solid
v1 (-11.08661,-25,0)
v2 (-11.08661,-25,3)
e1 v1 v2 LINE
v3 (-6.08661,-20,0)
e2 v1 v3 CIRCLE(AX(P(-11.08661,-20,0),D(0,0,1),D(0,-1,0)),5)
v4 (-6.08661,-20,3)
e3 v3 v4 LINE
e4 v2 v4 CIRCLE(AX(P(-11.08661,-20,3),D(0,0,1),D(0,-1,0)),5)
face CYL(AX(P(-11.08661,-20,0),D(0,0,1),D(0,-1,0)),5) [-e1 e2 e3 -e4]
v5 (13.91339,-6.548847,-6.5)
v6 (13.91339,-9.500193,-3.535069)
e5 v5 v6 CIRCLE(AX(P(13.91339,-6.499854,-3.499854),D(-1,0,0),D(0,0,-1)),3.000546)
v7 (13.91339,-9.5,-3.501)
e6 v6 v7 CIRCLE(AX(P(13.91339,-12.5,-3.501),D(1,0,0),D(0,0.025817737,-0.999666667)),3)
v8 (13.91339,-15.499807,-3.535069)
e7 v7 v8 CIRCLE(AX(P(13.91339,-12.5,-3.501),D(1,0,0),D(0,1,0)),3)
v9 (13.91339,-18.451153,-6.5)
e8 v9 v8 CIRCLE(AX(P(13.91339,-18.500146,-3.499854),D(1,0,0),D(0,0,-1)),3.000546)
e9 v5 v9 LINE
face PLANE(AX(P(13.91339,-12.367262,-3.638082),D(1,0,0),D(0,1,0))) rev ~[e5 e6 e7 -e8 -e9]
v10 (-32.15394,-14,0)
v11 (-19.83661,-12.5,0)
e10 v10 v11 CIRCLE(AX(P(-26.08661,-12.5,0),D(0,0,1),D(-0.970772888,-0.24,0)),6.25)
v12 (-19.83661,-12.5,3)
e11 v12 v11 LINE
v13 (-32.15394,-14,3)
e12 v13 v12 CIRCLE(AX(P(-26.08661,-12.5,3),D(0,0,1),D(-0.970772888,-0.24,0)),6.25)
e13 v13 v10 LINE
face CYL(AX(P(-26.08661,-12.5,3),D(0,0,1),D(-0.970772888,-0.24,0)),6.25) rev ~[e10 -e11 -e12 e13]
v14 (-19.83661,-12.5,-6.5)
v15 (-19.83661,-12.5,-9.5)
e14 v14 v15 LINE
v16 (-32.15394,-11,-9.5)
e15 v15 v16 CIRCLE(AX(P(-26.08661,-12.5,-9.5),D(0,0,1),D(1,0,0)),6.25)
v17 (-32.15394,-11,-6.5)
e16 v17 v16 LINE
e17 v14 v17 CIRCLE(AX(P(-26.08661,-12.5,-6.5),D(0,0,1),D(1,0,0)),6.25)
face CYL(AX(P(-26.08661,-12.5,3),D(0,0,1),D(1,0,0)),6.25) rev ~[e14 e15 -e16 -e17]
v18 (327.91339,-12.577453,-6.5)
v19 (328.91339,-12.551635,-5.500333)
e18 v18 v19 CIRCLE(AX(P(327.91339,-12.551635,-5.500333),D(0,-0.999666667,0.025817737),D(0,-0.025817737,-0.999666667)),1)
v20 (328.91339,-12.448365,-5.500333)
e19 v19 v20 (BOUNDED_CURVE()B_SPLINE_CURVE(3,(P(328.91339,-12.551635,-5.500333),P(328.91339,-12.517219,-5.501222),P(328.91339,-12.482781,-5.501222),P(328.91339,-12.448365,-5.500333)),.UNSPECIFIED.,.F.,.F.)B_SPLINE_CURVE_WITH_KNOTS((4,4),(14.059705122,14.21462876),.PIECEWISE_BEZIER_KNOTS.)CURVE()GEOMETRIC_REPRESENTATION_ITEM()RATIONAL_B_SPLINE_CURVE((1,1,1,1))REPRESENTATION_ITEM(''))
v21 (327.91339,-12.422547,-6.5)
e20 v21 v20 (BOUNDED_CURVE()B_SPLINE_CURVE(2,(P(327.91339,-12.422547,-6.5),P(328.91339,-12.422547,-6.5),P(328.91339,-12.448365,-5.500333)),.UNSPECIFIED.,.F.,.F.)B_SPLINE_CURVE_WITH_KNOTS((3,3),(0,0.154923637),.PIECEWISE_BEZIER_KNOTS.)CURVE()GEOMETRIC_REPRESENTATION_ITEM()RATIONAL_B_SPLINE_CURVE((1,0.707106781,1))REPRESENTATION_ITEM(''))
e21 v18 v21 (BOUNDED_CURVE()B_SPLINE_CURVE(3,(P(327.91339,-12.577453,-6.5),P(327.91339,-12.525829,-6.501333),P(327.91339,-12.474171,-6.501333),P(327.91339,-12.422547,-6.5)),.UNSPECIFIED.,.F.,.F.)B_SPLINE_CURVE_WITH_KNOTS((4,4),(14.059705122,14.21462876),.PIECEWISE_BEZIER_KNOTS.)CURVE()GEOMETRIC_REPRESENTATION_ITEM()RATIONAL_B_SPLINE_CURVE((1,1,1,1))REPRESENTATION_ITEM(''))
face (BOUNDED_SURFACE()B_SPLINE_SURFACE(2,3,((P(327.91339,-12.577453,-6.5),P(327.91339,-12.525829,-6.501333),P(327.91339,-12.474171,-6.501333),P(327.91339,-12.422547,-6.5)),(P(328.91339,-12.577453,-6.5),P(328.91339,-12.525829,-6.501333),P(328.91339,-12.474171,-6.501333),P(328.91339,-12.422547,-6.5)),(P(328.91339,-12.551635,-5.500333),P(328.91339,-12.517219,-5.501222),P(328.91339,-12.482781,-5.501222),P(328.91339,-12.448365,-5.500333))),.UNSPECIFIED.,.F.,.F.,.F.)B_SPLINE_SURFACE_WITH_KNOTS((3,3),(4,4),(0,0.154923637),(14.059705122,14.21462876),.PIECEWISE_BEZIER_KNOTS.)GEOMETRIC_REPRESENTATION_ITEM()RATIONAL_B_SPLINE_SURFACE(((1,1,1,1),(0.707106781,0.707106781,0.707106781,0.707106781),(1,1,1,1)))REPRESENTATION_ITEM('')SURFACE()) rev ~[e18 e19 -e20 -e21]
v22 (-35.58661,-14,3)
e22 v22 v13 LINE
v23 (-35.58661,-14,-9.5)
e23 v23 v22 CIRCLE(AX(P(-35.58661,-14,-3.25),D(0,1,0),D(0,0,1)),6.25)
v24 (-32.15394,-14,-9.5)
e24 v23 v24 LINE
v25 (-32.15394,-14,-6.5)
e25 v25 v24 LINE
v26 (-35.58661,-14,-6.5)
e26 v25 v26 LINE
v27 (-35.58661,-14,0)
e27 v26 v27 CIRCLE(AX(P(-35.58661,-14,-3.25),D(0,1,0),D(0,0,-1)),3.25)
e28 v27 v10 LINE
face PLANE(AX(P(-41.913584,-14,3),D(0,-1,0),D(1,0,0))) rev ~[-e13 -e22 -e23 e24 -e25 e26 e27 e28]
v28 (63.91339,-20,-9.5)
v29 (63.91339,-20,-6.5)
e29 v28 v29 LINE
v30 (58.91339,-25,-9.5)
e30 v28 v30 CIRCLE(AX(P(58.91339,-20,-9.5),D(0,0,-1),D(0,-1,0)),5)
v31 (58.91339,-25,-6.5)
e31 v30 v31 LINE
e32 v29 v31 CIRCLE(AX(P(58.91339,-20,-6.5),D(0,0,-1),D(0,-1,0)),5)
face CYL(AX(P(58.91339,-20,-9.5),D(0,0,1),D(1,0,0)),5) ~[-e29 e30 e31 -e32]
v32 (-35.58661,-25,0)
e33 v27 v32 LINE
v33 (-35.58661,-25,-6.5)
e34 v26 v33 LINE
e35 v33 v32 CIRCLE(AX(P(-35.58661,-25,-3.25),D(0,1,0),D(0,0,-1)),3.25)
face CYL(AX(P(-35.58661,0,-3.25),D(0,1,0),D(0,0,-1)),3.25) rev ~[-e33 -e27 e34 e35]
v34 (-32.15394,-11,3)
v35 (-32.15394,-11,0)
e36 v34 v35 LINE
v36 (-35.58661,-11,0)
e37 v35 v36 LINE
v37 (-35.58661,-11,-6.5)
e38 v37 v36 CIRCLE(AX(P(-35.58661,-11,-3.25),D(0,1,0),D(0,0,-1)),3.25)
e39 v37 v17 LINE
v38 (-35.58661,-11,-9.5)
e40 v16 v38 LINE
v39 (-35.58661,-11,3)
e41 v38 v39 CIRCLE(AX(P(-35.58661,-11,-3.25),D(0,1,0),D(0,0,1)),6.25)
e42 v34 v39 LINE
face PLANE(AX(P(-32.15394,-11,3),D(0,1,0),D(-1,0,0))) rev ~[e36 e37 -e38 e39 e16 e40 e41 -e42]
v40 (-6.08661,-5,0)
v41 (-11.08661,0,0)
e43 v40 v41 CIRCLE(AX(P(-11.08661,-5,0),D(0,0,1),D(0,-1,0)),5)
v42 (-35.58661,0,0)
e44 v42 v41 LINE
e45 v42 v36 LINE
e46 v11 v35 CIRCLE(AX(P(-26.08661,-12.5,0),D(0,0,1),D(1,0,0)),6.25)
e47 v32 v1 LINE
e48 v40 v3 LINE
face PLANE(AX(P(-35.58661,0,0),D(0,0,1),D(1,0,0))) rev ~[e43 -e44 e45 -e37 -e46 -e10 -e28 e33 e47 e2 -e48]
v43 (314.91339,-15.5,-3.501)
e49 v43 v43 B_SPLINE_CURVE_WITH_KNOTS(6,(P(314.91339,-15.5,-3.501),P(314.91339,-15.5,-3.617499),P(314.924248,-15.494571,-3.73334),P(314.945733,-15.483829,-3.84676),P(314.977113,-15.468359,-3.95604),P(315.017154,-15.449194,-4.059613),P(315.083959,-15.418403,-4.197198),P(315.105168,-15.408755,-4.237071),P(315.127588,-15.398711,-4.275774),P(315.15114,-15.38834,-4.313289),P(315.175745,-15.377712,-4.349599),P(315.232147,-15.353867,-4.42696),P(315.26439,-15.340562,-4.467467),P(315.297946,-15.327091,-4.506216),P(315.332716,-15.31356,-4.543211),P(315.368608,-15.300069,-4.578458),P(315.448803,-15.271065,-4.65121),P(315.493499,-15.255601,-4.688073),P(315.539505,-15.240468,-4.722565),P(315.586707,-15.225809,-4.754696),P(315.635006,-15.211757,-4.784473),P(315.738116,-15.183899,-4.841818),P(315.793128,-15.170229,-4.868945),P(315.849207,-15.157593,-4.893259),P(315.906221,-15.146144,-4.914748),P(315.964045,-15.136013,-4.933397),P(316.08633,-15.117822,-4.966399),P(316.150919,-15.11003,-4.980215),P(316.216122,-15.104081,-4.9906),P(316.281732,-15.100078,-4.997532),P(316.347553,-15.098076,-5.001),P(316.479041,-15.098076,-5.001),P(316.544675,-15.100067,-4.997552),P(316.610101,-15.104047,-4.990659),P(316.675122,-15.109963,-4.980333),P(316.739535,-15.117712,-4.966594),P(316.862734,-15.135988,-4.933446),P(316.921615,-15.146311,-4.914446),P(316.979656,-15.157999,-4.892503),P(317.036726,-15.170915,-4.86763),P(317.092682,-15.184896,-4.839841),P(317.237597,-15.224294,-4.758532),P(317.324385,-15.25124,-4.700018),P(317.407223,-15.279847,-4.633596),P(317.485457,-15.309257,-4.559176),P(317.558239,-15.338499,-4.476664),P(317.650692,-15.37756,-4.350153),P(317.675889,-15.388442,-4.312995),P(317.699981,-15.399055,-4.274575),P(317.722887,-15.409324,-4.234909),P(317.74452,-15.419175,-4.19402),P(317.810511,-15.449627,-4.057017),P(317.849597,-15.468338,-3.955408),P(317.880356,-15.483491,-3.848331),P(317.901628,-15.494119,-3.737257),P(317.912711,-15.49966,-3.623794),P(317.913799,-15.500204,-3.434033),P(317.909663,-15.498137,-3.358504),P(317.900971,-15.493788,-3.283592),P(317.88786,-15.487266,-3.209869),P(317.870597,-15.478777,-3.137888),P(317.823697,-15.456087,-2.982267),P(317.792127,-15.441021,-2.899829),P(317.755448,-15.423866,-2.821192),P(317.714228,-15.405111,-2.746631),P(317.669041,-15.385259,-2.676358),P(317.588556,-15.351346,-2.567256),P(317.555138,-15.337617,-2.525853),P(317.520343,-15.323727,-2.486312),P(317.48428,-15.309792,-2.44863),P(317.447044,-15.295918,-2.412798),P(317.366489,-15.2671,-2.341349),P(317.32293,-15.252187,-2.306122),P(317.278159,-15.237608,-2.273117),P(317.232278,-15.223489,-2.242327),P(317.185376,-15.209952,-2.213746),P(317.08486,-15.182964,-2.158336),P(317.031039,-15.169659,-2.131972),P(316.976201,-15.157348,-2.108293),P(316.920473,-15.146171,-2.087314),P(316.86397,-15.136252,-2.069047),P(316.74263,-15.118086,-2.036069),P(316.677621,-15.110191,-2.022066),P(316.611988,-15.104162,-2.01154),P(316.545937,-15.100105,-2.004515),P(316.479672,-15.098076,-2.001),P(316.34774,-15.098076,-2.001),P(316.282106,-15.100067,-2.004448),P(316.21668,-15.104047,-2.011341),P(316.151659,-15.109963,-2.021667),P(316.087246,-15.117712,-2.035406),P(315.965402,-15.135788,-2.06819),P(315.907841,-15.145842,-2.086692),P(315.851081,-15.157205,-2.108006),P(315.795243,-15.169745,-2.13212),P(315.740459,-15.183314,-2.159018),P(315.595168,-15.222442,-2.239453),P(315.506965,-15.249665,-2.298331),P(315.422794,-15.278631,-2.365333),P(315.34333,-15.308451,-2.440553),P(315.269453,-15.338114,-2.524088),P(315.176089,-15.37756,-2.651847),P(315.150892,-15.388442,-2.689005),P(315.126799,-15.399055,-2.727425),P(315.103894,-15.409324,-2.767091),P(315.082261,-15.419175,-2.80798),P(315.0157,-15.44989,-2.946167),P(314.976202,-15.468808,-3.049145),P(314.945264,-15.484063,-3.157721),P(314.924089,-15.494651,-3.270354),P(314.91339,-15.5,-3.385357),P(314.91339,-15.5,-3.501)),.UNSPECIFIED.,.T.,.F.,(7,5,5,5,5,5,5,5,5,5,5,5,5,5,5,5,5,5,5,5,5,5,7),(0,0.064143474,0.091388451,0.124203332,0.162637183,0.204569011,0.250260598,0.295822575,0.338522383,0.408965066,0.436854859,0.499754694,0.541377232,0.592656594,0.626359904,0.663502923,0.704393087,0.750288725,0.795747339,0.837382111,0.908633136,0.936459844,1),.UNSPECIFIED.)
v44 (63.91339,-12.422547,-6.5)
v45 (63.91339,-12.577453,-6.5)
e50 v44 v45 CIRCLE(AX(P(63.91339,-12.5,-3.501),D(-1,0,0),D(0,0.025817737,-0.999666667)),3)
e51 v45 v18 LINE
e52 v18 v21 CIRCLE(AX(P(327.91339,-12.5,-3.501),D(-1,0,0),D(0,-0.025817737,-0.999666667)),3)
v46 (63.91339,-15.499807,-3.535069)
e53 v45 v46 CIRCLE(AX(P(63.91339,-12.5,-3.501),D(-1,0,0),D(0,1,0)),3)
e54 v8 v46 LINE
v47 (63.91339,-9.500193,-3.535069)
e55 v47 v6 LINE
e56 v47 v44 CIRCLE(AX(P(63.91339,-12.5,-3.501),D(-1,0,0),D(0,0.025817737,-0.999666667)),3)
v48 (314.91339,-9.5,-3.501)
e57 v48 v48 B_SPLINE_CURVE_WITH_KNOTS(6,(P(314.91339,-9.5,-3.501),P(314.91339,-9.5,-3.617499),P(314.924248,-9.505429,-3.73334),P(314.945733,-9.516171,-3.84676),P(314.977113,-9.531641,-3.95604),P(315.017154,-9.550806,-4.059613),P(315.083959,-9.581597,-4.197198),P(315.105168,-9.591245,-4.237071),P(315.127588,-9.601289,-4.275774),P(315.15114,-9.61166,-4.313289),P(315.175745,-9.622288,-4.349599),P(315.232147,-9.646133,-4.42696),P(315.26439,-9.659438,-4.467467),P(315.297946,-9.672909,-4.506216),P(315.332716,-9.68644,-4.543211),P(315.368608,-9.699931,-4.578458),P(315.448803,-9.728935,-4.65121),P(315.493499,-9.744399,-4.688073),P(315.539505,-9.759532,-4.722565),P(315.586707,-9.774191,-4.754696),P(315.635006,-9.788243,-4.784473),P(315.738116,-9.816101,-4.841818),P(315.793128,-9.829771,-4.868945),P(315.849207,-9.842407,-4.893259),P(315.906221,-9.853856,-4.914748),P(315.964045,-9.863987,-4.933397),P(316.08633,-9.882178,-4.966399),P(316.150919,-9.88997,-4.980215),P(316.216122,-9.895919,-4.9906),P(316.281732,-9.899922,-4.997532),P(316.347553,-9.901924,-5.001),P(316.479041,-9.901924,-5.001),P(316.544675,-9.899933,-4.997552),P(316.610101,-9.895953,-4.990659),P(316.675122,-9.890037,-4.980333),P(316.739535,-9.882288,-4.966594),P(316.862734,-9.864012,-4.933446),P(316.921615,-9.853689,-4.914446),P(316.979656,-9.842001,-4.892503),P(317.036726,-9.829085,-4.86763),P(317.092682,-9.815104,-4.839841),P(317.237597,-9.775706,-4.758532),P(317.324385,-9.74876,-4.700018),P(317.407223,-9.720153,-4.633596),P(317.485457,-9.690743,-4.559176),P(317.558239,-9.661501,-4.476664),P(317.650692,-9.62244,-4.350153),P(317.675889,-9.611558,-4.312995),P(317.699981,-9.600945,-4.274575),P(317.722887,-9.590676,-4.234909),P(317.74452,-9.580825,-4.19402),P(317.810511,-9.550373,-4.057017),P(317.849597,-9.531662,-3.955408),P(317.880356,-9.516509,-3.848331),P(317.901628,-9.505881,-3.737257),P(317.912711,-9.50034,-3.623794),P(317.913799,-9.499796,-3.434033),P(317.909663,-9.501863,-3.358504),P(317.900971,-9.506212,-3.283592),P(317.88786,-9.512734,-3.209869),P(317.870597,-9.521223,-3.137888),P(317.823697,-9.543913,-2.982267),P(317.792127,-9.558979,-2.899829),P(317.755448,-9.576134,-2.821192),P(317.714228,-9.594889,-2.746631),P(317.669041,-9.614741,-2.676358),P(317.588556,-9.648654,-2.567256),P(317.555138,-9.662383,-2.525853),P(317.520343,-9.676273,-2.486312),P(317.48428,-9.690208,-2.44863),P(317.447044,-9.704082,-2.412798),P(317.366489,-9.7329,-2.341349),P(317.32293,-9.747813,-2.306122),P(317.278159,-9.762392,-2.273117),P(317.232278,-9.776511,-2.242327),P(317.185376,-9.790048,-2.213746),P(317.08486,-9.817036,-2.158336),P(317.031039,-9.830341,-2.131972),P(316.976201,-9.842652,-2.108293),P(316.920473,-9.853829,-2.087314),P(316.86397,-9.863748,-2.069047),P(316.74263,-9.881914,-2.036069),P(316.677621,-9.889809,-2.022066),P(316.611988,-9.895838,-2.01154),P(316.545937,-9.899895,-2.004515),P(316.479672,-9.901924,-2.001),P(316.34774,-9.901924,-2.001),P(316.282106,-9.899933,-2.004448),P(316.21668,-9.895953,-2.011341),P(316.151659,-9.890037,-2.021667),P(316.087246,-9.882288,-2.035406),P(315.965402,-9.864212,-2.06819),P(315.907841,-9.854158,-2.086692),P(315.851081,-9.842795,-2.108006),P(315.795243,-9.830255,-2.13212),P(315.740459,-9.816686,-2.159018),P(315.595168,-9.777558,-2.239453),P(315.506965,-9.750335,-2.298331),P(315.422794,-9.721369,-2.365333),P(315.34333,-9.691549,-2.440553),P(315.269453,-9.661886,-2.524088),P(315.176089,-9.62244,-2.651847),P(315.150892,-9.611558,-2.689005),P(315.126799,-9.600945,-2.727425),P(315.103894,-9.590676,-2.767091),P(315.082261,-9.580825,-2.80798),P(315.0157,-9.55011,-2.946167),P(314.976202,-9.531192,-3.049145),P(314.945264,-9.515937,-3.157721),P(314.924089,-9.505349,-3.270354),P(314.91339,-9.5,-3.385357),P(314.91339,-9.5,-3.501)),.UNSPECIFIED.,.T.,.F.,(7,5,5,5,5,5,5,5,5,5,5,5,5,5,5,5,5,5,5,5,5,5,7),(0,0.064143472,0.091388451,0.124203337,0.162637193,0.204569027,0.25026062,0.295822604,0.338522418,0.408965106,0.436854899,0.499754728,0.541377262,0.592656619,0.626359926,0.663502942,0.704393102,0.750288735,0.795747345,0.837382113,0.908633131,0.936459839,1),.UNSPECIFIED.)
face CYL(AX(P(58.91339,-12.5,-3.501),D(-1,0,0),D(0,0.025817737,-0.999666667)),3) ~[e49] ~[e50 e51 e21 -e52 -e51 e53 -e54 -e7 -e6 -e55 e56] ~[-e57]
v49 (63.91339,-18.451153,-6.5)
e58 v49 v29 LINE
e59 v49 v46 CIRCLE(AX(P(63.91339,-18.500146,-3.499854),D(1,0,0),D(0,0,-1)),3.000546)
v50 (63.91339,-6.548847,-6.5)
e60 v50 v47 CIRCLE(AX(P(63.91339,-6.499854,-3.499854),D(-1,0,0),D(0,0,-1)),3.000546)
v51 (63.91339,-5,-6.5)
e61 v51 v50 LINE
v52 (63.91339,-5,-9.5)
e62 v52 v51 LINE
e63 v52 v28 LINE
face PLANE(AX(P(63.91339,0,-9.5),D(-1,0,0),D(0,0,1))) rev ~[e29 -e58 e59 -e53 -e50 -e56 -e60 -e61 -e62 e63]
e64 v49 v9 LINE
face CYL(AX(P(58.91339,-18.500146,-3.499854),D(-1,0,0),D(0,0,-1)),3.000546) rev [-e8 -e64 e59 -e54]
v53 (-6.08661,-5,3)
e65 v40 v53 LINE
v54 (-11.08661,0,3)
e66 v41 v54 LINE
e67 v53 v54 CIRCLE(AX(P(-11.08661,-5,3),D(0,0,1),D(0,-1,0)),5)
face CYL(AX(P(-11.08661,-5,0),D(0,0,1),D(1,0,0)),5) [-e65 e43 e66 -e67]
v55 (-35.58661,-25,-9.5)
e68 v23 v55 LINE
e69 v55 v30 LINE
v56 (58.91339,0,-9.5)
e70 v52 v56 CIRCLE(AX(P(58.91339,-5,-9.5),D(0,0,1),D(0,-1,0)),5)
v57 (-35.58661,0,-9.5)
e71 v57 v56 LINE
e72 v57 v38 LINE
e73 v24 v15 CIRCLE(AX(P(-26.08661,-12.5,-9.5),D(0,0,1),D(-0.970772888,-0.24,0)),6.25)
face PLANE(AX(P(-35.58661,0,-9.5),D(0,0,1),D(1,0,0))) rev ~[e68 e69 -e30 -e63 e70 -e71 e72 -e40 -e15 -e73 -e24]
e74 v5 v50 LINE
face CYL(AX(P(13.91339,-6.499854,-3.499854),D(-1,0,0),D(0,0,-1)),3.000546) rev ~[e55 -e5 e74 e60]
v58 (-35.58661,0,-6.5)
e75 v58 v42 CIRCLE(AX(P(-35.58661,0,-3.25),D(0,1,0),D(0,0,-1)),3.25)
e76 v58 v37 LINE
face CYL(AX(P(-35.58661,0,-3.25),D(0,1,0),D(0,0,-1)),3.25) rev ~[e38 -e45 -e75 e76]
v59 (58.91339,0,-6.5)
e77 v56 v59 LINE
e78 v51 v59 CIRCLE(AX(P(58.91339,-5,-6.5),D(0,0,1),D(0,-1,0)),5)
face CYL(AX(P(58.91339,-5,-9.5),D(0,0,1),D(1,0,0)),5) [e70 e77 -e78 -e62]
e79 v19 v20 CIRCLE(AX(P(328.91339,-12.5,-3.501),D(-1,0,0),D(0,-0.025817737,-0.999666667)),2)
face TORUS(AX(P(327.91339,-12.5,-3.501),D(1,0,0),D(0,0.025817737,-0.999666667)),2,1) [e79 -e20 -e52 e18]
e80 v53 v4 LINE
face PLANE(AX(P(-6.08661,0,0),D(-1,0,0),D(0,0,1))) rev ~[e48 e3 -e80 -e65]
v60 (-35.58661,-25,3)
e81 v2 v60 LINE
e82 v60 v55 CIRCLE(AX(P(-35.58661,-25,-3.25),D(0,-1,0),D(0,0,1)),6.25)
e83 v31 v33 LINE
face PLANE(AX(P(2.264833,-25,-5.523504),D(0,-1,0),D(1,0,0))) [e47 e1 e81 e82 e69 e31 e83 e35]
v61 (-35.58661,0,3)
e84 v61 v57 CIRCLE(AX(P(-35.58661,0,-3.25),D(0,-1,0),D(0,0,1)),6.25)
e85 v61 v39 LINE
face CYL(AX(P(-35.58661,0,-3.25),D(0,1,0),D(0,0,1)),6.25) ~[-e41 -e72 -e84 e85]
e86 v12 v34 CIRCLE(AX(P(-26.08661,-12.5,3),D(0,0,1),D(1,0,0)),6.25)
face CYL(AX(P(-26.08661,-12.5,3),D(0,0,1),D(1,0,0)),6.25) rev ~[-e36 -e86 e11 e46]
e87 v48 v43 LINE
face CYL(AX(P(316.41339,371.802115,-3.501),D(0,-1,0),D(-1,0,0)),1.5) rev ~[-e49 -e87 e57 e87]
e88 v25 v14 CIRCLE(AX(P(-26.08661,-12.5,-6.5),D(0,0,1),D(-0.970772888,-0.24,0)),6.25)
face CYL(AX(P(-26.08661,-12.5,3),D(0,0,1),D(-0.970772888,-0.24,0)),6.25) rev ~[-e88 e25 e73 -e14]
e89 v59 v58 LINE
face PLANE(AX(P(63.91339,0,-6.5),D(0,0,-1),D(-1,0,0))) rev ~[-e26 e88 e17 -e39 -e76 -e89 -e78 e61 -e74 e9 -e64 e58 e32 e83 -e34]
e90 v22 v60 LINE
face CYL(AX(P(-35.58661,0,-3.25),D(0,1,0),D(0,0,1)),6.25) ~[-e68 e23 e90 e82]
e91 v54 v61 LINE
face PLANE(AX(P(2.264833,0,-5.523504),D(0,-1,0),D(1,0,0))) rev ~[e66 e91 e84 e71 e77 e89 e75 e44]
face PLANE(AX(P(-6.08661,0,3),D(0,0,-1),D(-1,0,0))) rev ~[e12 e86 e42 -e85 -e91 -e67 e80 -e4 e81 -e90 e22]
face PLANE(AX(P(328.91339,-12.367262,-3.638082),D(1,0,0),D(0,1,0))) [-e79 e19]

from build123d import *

# Parameters (mm, degrees)
F1_DEPTH      = 25
F3_DEPTH      = 12.501
F4_DEPTH      = 12.501
F7_DEPTH      = 270
F7_DEPTH_BACK = 45
F8_T1_DEPTH   = 45
F8_T3_DEPTH   = 5
F9_R          = 5
F10_R         = 1
F12_D         = 3


# Not quite as in the source:
# - a fillet or chamfer that OpenCascade refuses, or shapes differently, is made with other operations: its cross-section is extruded or revolved along the edge and cut away or added


with BuildPart() as f1:
    # F0 (on Front) → F1 (new body)
    with BuildSketch(Plane.XZ):
        with BuildLine():
            ThreePointArc((-35.5866095653, 3), (-41.8366095653, -3.25), (-35.5866095653, -9.5))
            Line((-35.5866095653, -9.5), (63.9133904347, -9.5))
            Line((63.9133904347, -9.5), (63.9133904347, -6.5))
            Line((63.9133904347, -6.5), (-35.5866095653, -6.5))
            ThreePointArc((-35.5866095653, -6.5), (-38.8366095653, -3.25), (-35.5866095653, 0))
            Line((-35.5866095653, 0), (-6.0866095653, 0))
            Line((-6.0866095653, 0), (-6.0866095653, 3))
            Line((-6.0866095653, 3), (-35.5866095653, 3))
        make_face()
    extrude(amount=F1_DEPTH)

    # F2 (on face) → F3 (cut, through all)
    with BuildSketch(Plane.XY.offset(3)):
        with BuildLine():
            ThreePointArc((-32.153940115, -14), (-25.3310686782, -18.7041645665), (-19.8366095653, -12.5))
            ThreePointArc((-19.8366095653, -12.5), (-25.3310686782, -6.2958354335), (-32.153940115, -11))
            ThreePointArc((-32.153940115, -11), (-32.3366095653, -12.5), (-32.153940115, -14))
        make_face()
    extrude(amount=-F3_DEPTH, mode=Mode.SUBTRACT)

    # F2 (on face) → F4 (cut, through all)
    with BuildSketch(Plane.XY.offset(3)):
        with BuildLine():
            ThreePointArc((-32.153940115, -14), (-25.3310686782, -18.7041645665), (-19.8366095653, -12.5))
            ThreePointArc((-19.8366095653, -12.5), (-25.3310686782, -6.2958354335), (-32.153940115, -11))
            ThreePointArc((-32.153940115, -11), (-32.3366095653, -12.5), (-32.153940115, -14))
        make_face()
        with BuildLine():
            ThreePointArc((-32.153940115, -14), (-32.3366095653, -12.5), (-32.153940115, -11))
            Line((-32.153940115, -11), (-41.9135839269, -11))
            Line((-41.9135839269, -11), (-41.9135839269, -14))
            Line((-41.9135839269, -14), (-32.153940115, -14))
        make_face()
    extrude(amount=-F4_DEPTH, mode=Mode.SUBTRACT)

    # F6 (on offset) → F7 (join, two sides)
    with BuildSketch(Plane.YZ.offset(58.9133904347)) as f7_sk:
        with BuildLine():
            ThreePointArc((-12.4225467883, -6.5), (-10.3514703126, -5.5947574316), (-9.5, -3.501))
            ThreePointArc((-9.5, -3.501), (-14.5937574316, -1.3524703126), (-12.5774532117, -6.5))
            Line((-12.5774532117, -6.5), (-12.4225467883, -6.5))
        make_face()
        with BuildLine():
            Line((-12.4225467883, -6.5), (-12.5774532117, -6.5))
            ThreePointArc((-12.5774532117, -6.5), (-12.5, -6.501), (-12.4225467883, -6.5))
        make_face()
    extrude(amount=F7_DEPTH)
    extrude(f7_sk.sketch, amount=-F7_DEPTH_BACK)

    # F8: fillet of radius 3 on 4 edges, made by hand

    # F8_s2 → F8_t1 (join)
    with BuildSketch(Plane.YZ.offset(13.9133904347)):
        with BuildLine():
            ThreePointArc((-18.5001459648, -6.5004), (-16.3786421293, -5.6217630236), (-15.4995999453, -3.5004270532))
            Line((-15.4995999453, -3.5004270532), (-15.1995453433, -3.500484366))
            ThreePointArc((-15.1995453433, -3.500484366), (-14.4336951193, -5.3852845615), (-12.5697064807, -6.2000454108))
            Line((-12.5697064807, -6.2000454108), (-12.5774532117, -6.8000546074))
            ThreePointArc((-12.5774532117, -6.8000546074), (-15.5387995882, -6.8000546074), (-18.5001459648, -6.8004546074))
            Line((-18.5001459648, -6.8004546074), (-18.5001459648, -6.5004))
        make_face()
        with BuildLine():
            ThreePointArc((-6.4998540352, -6.5004), (-8.6213578707, -5.6217630236), (-9.5004000547, -3.5004270532))
            Line((-9.5004000547, -3.5004270532), (-9.8004546567, -3.500484366))
            ThreePointArc((-9.8004546567, -3.500484366), (-10.5663048807, -5.3852845615), (-12.4302935193, -6.2000454108))
            Line((-12.4302935193, -6.2000454108), (-12.4225467883, -6.8000546074))
            ThreePointArc((-12.4225467883, -6.8000546074), (-9.4612004118, -6.8000546074), (-6.4998540352, -6.8004546074))
            Line((-6.4998540352, -6.8004546074), (-6.4998540352, -6.5004))
        make_face()
    extrude(amount=F8_T1_DEPTH)

    # F8_s4 → F8_t3 (join)
    with BuildSketch(Plane.YZ.offset(58.9133904347)):
        with BuildLine():
            ThreePointArc((-18.5001459648, -6.5004), (-16.3786421293, -5.6217630236), (-15.4995999453, -3.5004270532))
            Line((-15.4995999453, -3.5004270532), (-15.1995453433, -3.500484366))
            ThreePointArc((-15.1995453433, -3.500484366), (-14.4336951193, -5.3852845615), (-12.5697064807, -6.2000454108))
            Line((-12.5697064807, -6.2000454108), (-12.5774532117, -6.8000546074))
            ThreePointArc((-12.5774532117, -6.8000546074), (-15.5387995882, -6.8000546074), (-18.5001459648, -6.8004546074))
            Line((-18.5001459648, -6.8004546074), (-18.5001459648, -6.5004))
        make_face()
        with BuildLine():
            ThreePointArc((-6.4998540352, -6.5004), (-8.6213578707, -5.6217630236), (-9.5004000547, -3.5004270532))
            Line((-9.5004000547, -3.5004270532), (-9.8004546567, -3.500484366))
            ThreePointArc((-9.8004546567, -3.500484366), (-10.5663048807, -5.3852845615), (-12.4302935193, -6.2000454108))
            Line((-12.4302935193, -6.2000454108), (-12.4225467883, -6.8000546074))
            ThreePointArc((-12.4225467883, -6.8000546074), (-9.4612004118, -6.8000546074), (-6.4998540352, -6.8004546074))
            Line((-6.4998540352, -6.8004546074), (-6.4998540352, -6.5004))
        make_face()
    extrude(amount=F8_T3_DEPTH)

    # F9
    f9_edges = [f1.edges().sort_by_distance(p)[0] for p in [
        (63.91339, -25, -8),
        (63.91339, 0, -8),
        (-6.08661, 0, 1.5),
        (-6.08661, -25, 1.5),
    ]]
    fillet(f9_edges, radius=F9_R)

    # F10
    f10_edges = [f1.edges().sort_by_distance(p)[0] for p in [
        (328.91339, -15.5, -3.501),
    ]]
    fillet(f10_edges, radius=F10_R)

    # F12 (through all)
    with Locations(Plane(origin=(0, 0, 0), x_dir=(1, 0, 0), z_dir=(0, 1, 0))):
        with Locations((316.4133904347, 3.501)):
            Hole(F12_D / 2)


solid = f1.part
